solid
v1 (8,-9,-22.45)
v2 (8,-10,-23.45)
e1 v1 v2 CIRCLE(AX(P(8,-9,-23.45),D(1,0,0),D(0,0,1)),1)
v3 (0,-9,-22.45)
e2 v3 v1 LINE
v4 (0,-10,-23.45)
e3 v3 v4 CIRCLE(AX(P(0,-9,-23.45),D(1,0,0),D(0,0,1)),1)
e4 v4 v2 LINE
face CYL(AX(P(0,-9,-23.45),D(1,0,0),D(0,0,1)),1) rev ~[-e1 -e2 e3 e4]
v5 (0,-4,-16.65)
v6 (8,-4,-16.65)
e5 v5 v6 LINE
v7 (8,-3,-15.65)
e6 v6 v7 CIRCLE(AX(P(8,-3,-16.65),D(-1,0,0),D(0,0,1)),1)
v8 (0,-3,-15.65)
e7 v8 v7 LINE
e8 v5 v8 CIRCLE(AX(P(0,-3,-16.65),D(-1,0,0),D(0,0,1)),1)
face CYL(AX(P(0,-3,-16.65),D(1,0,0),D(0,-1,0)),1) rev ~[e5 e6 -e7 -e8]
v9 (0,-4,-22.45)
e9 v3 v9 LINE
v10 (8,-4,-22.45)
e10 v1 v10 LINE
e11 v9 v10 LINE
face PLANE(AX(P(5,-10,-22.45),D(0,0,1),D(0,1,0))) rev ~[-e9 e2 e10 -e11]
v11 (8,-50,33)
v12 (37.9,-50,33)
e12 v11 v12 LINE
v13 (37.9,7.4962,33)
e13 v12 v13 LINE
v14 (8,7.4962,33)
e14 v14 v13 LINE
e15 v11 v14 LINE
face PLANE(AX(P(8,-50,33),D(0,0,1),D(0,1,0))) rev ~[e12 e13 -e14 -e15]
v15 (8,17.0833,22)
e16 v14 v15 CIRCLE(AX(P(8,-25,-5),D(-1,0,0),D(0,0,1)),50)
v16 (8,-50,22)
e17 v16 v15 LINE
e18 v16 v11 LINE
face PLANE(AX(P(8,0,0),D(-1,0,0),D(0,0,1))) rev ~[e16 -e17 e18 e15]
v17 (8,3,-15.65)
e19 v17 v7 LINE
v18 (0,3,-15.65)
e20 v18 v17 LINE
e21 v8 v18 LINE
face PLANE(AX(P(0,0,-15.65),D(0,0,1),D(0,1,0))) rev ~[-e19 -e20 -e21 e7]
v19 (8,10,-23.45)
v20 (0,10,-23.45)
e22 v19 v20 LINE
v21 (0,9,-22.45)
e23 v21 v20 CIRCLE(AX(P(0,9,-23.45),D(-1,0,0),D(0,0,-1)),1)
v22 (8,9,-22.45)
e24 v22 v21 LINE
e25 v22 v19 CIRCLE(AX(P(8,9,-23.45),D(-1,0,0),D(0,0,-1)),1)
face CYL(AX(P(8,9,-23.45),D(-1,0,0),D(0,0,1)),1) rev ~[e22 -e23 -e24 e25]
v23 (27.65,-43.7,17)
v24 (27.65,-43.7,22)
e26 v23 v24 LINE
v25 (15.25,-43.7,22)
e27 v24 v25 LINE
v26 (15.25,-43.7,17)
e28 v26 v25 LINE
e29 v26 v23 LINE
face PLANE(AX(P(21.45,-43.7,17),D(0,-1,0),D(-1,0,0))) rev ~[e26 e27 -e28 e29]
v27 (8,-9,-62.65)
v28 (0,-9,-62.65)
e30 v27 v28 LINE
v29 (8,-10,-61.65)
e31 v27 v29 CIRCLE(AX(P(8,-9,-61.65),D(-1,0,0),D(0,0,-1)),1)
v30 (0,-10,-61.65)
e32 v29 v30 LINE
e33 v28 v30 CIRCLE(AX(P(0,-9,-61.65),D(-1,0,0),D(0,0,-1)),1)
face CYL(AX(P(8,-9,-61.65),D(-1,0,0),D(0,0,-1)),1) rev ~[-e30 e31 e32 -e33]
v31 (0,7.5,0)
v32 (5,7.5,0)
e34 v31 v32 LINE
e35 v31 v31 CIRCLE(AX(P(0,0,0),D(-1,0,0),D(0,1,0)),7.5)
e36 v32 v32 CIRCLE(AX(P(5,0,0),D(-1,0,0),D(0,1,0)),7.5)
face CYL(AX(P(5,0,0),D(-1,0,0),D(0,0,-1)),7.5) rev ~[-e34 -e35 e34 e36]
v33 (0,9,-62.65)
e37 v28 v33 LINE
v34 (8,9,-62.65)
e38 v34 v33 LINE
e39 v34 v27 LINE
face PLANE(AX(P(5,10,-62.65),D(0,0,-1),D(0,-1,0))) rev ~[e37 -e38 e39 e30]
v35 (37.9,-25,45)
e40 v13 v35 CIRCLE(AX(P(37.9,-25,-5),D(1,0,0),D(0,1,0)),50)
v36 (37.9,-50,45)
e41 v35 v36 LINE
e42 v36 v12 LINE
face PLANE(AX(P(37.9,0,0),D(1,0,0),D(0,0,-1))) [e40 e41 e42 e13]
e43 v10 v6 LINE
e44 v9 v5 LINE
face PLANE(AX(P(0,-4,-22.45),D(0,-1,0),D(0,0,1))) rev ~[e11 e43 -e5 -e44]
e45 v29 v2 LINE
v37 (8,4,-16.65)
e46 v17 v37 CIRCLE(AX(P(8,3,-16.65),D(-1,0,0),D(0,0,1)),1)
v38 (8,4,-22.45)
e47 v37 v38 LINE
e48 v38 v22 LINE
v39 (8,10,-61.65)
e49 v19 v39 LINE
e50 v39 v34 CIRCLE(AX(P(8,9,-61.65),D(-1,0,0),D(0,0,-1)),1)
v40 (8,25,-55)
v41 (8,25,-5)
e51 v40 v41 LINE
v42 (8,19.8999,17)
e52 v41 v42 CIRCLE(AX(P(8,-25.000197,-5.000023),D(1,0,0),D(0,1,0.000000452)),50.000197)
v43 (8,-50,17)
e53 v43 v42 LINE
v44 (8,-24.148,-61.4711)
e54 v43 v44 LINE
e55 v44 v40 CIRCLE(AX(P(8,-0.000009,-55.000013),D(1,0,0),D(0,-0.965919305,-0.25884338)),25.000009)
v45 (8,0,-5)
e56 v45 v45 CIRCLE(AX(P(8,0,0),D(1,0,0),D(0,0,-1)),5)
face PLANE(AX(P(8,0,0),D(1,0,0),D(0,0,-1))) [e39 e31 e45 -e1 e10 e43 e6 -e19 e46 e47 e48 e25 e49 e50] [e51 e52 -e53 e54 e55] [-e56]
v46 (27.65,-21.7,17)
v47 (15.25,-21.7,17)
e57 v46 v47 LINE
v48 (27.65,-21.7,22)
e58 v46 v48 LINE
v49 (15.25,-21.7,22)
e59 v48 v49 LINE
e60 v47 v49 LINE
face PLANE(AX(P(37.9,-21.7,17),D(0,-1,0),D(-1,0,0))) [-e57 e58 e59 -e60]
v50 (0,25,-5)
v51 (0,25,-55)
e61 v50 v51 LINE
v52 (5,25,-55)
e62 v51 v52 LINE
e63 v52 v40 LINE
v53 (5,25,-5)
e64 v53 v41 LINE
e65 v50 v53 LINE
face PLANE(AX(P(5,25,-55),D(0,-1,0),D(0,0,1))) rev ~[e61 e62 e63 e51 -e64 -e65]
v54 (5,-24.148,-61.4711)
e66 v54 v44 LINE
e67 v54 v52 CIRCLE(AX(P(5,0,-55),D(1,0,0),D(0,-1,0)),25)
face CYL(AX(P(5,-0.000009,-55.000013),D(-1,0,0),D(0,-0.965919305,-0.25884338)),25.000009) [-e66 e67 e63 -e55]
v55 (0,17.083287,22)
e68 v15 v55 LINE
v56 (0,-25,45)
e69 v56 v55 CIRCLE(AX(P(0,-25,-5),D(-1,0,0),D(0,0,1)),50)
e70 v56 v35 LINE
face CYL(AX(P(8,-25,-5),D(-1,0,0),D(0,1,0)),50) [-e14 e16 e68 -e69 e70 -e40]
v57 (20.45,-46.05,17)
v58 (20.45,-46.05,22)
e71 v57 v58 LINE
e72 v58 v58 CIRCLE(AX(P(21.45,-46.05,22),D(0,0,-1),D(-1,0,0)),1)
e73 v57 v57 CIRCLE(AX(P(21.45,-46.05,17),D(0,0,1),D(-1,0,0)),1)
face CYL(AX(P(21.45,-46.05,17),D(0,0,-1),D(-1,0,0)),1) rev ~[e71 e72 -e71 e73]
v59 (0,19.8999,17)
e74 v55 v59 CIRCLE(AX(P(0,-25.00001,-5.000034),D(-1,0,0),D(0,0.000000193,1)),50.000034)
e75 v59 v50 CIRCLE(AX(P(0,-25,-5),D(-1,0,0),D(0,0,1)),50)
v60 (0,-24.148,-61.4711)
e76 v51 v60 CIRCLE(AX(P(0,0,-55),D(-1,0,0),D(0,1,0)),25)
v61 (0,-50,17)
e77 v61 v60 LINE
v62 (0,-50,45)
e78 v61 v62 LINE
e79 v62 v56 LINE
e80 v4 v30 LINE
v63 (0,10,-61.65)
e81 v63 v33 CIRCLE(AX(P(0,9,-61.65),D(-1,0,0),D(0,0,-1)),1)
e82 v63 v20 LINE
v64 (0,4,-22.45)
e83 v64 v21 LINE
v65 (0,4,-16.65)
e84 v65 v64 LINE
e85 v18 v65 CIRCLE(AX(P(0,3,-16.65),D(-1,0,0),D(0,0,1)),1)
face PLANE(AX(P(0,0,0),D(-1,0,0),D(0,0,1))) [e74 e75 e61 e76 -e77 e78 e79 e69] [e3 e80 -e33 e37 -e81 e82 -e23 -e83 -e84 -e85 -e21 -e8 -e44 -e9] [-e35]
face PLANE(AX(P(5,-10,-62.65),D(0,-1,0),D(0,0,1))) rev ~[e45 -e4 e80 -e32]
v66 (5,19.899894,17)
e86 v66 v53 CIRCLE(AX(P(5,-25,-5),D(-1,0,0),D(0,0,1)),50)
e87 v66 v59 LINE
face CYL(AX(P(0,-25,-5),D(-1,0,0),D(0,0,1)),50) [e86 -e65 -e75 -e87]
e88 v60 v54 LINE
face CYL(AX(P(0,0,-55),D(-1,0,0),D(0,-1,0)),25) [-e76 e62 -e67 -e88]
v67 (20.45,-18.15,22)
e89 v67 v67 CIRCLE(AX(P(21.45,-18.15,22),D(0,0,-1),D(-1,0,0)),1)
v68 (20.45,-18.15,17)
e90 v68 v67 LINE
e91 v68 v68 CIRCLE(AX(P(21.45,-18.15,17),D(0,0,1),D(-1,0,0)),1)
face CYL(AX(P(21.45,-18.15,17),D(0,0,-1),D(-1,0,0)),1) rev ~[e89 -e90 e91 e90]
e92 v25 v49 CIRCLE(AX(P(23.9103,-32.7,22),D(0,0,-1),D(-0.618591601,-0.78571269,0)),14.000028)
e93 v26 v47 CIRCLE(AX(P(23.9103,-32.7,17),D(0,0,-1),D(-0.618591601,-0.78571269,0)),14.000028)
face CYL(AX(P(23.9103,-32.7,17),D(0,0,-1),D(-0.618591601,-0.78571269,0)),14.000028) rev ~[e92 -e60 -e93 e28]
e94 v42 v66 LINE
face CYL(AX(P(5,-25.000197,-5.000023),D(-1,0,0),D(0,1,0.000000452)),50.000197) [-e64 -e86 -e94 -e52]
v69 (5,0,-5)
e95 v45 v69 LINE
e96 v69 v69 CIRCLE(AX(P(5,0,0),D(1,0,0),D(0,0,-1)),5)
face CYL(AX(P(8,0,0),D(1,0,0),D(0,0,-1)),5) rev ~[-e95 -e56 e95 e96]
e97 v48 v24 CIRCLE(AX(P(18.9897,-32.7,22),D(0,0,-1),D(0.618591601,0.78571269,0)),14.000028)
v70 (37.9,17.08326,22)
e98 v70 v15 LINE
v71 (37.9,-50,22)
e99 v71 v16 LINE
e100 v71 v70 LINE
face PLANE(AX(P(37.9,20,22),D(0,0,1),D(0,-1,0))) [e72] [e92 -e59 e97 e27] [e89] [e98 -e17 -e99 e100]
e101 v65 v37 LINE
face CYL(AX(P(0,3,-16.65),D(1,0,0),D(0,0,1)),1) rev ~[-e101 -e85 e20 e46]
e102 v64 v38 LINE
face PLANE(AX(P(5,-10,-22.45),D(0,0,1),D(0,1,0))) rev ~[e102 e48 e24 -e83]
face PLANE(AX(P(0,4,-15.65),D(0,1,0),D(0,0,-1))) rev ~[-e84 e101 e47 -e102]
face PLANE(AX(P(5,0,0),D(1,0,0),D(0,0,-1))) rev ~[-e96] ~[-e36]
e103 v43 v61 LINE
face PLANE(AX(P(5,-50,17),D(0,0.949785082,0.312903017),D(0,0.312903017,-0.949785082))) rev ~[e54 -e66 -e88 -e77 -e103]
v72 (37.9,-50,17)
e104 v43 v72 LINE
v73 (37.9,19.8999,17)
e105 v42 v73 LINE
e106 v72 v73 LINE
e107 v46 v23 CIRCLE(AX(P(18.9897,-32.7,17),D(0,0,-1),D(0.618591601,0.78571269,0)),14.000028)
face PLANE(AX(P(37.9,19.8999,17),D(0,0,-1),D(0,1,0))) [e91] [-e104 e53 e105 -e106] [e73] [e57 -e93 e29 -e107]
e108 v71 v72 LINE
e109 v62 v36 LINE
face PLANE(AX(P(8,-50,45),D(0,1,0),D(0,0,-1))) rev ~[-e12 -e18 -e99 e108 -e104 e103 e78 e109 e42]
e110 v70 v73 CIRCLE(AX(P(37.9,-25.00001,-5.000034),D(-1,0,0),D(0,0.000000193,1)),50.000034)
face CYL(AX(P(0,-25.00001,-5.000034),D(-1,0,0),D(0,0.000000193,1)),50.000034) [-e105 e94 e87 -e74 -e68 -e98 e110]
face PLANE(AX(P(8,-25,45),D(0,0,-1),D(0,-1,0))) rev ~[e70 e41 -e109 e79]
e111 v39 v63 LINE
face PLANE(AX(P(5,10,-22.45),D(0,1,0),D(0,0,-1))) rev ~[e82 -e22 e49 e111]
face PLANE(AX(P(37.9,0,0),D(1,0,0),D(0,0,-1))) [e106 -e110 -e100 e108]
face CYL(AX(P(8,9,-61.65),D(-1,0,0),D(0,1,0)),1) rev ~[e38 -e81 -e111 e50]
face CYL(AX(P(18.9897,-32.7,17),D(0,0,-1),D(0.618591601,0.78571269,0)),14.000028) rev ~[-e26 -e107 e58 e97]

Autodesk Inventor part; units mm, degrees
ref_plane "YZ Plane" through (0, 0, 0) normal (1, 0, 0) x (0, 1, 0)
ref_plane "XZ Plane" through (0, 0, 0) normal (0, 1, 0) x (-1, 0, 0)
ref_plane "XY Plane" through (0, 0, 0) normal (0, 0, 1) x (1, 0, 0)
sketch "Sketch1" plane through (0, 0, 0) normal (1, 0, 0) x (0, 1, 0)
  circle A0 centre (0, 0) radius 16.575
  line L0 (0, 16.575) -> (0, -49.725)
  line L1 (0, -33.15) -> (0, -15.05)
  line L2 (0, -15.05) -> (0, -70.05)
  line L3 (10, -70.05) -> (-10, -70.05)
  line L4 (-10, -70.05) -> (-10, -15.05)
  line L5 (-10, -15.05) -> (10, -15.05)
  line L6 (10, -15.05) -> (10, -70.05)
  line L7 (10, -70.05) -> (-10, -15.05) construction
  line L8 (-10, -70.05) -> (10, -15.05) construction
  line L9 (10, -62.65) -> (-10, -62.65)
  line L10 (-10, -62.65) -> (-10, -22.45)
  line L11 (-10, -22.45) -> (10, -22.45)
  line L12 (10, -22.45) -> (10, -62.65)
  line L13 (10, -62.65) -> (-10, -22.45) construction
  line L14 (-10, -62.65) -> (10, -22.45) construction
  line L15 (-4.95, -27.2) -> (-4.95, -17.7)
  line L16 (-4.95, -17.7) -> (4.95, -17.7)
  line L17 (4.95, -27.2) -> (-4.95, -17.7) construction
  line L18 (-4.95, -27.2) -> (4.95, -17.7) construction
  line L19 (4.95, -67.4) -> (-4.95, -67.4)
  line L20 (-4.95, -67.4) -> (-4.95, -57.9)
  line L21 (-4.95, -57.9) -> (4.95, -57.9)
  line L22 (4.95, -67.4) -> (-4.95, -57.9) construction
  line L23 (-4.95, -67.4) -> (4.95, -57.9) construction
  circle A1 centre (4.95, -17.7) radius 1.5
  circle A2 centre (-4.95, -17.7) radius 1.5
  circle A3 centre (4.95, -67.4) radius 1.5
  circle A4 centre (-4.95, -67.4) radius 1.5
  circle A5 centre (0, -33.15) radius 6.8
  line L24 (0, -80) -> (0, -55)
  arc A6 (-25, -55) -> (25, -55) centre (0, -55) ccw
  line L25 (0, 0) -> (0, 45)
  line L26 (25, 45) -> (-25, 45)
  line L27 (25, 45) -> (25, -55)
  line L28 (-25, 45) -> (-25, -55)
  circle A7 centre (0, 0) radius 7.5
  point P0 (0, -42.55)
  point P1 (0, -42.55)
  point P2 (0, -22.45)
  point P3 (0, -62.65)
  dimension "d0" = 33.15
  dimension "d2" = 66.3
  dimension "d4" = 18.1
  dimension "d5" = 55
  dimension "d6" = 20
  dimension "d7" = 55
  dimension "d8" = 40.2
  dimension "d9" = 9.9
  dimension "d10" = 9.5
  dimension "d11" = 9.9
  dimension "d12" = 9.5
  dimension "d13" = 3
  dimension "d14" = 3
  dimension "d15" = 3
  dimension "d16" = 3
  dimension "d17" = 13.6
  dimension "d20" = 25
  dimension "d21" = 45
  dimension "d22" = 15
extrude "Extrusion1" add sketch "Sketch1" along normal blind 5 contours A0 L5 L0 A7 | A0 L25 L26 L27 A6 L24 L3 L6 L5 | L0 A7 L5 A0 | A0 L5 L4 L3 L24 A6 L28 L26 L25 | L5 L6 L11 L0 A0 | A0 L0 L5 | L5 L0 A0 | A0 L0 L16 A2 L15 L11 L4 L5 | L0 L11 L15 A2 L16 | L6 L9 L2 L0 A5 L11 | L11 L0 A5 L2 L21 L20 L9 L4 | L6 L3 L2 L9 | L9 L20 A4 L19 L2 L3 L4 | L9 L20 L21 L2 | L2 L19 A4 L20 L9
sketch "Sketch2" plane through (5, 0, 0) normal (1, 0, 0) x (0, 0, -1)
  line L0 (-45, -25) -> (55, -25) projected
  circle A0 centre (33.15, 0) radius 6.8 projected
  line L1 (33.15, 0) -> (15.05, 0)
  line L2 (15.05, 0) -> (70.05, 0)
  line L3 (62.65, 10) -> (22.45, 10)
  line L4 (22.45, 10) -> (22.45, -10)
  line L5 (22.45, -10) -> (62.65, -10)
  line L6 (62.65, -10) -> (62.65, 10)
  line L7 (62.65, 10) -> (22.45, -10) construction
  line L8 (22.45, 10) -> (62.65, -10) construction
  point P0 (42.55, 0)
  dimension "d25" = 18.1
  dimension "d26" = 55
  dimension "d27" = 40.2
  dimension "d28" = 20
extrude "Extrusion2" cut sketch "Sketch2" against normal blind 5 contours L2 L6 L5 L4 L1 A0 | A0 L1 L4 L3 L6 L2
sketch "Sketch3" plane through (5, 0, 0) normal (1, 0, 0) x (0, 0, -1)
  circle A0 centre (17.7, 4.95) radius 1.5 projected
  circle A1 centre (17.7, -4.95) radius 1.5 projected
  circle A2 centre (67.4, 4.95) radius 1.5 projected
  circle A3 centre (67.4, -4.95) radius 1.5 projected
extrude "Extrusion3" add sketch "Sketch3" against normal blind 5
sketch "Sketch4" plane through (5, 0, 0) normal (1, 0, 0) x (0, 0, -1)
  line L0 (55, 25) -> (-45, 25) projected
  line L1 (-45, 25) -> (-45, -25) projected
  line L2 (-45, -25) -> (55, -25) projected
  line L3 (-45, 25) -> (-35, 25)
  line L4 (-35, 25) -> (-35, -25)
  line L5 (-35, -25) -> (-45, -25)
  line L6 (-45, -25) -> (-45, 25)
  dimension "d33" = 10
extrude "Extrusion4" add sketch "Sketch4" along normal blind 32.9
sketch "Sketch5" plane through (0, -25, -55) normal (0, -1, 0) x (1, 0, 0)
  line L0 (5, 90) -> (37.9, 90)
  line L1 (37.9, 90) -> (37.9, 100)
  line L2 (37.9, 100) -> (5, 100)
  line L3 (5, 100) -> (5, 90)
  point P0 (0, 55)
extrude "Extrusion5" add sketch "Sketch5" along normal blind 25
sketch "Sketch6" plane through (0, 0, 0) normal (-1, 0, 0) x (0, 0, 1)
  arc A0 (-55, 25) -> (-55, -25) centre (-55, 0) ccw projected
  line L0 (45, -25) -> (-55, -25) projected
  line L1 (-55, 25) -> (45, 25) projected
  line L2 (45, -25) -> (45, -50)
  line L3 (45, -50) -> (35, -50)
  line L4 (35, -50) -> (-61.4711, -24.148)
  line L5 (-55, -25) -> (45, -25)
  arc A1 (-61.4711, -24.148) -> (-55, -25) centre (-55, 0) ccw
  dimension "d38" = 25
  dimension "d39" = 10
extrude "Extrusion6" add sketch "Sketch6" against normal blind 5
sketch "Sketch7" plane through (0, 25, 45) normal (0, 0, 1) x (1, 0, 0)
  line L0 (37.9, -75) -> (0, -75) projected
  line L1 (0, 0) -> (37.9, 0) projected
  line L2 (18.95, -75) -> (18.95, -62.5)
  circle A0 centre (18.95, -62.5) radius 7.5
  point P0 (0, -25)
  dimension "d42" = 12.5
  dimension "d43" = 15
extrude "Extrusion7" cut sketch "Sketch7" against normal blind 10
sketch "Sketch8" plane through (5, 0, 0) normal (1, 0, 0) x (0, 0, -1)
  line L0 (-35, 25) -> (-35, -50) projected
  line L1 (55, 25) -> (-35, 25) projected
  line L2 (-35, -50) -> (-35, 25)
  line L3 (-35, -50) -> (-17, -50)
  line L4 (-17, -50) -> (-17, 25)
  line L5 (-17, -50) -> (61.4711, -24.148)
  line L6 (-17, -50) -> (-22, -50)
  line L7 (-22, -50) -> (-22, 25)
  line L8 (-17, 25) -> (-22, 25)
  dimension "d46" = 18
  dimension "d47" = 5
extrude "Extrusion8" add sketch "Sketch8" along normal blind 32.9 contours L1 L4 L3 L7
sketch "Sketch9" plane through (0, 0, 0) normal (-1, 0, 0) x (0, 0, 1)
  line L0 (-61.4711, -24.148) -> (35, -50) projected
  arc A0 (-55, 25) -> (-61.4711, -24.148) centre (-55, 0) ccw projected
  line L1 (17, -50) -> (-61.4711, -24.148)
  line L2 (-61.4711, -24.148) -> (35, -50)
  line L3 (35, -50) -> (17, -50)
  line L4 (35, -50) -> (17, -50)
  line L5 (17, -50) -> (-61.4711, -24.148)
  line L6 (-61.4711, -24.148) -> (35, -50)
  point P0 (45, -50)
  dimension "d50" = 28
extrude "Extrusion9" add sketch "Sketch9" against normal blind 5
sketch "Sketch11" plane through (0, 25, 45) normal (0, 0, 1) x (1, 0, 0)
  circle A0 centre (18.95, -62.5) radius 7.5 projected
  point P0 (0, -25)
extrude "Extrusion10" add sketch "Sketch11" against normal blind 10
sketch "Sketch12" plane through (0, 25, 45) normal (0, 0, 1) x (1, 0, 0)
  line L0 (37.9, -75) -> (0, -75) projected
  line L1 (0, -75) -> (5, -75)
  line L2 (37.9, -75) -> (5, -75)
  line L3 (21.45, -75) -> (21.45, -62.5)
  circle A0 centre (21.45, -62.5) radius 6.8
  point P0 (0, -25)
  dimension "d55" = 5
  dimension "d56" = 12.5
  dimension "d57" = 13.6
extrude "Extrusion11" cut sketch "Sketch12" against normal blind 10
sketch "Sketch13" plane through (37.9, 25, 17) normal (0, 0, -1) x (-1, 0, 0)
  line L0 (32.9, -75) -> (0, -75) projected
  line L1 (16.45, -75) -> (16.45, -62.5)
  circle A0 centre (16.45, -62.5) radius 6.2
  line L2 (16.45, -62.5) -> (16.45, -50.3)
  circle A1 centre (16.45, -56.4) radius 3.1
  point P0 (37.9, -25)
  dimension "d60" = 12.5
  dimension "d61" = 12.4
  dimension "d62" = 12.2
  dimension "d63" = 6.2
extrude "Extrusion12" cut sketch "Sketch13" against normal blind 5
sketch "Sketch15" plane through (37.9, 25, 17) normal (0, 0, -1) x (-1, 0, 0)
  arc A0 (13.4271, -57.0869) -> (19.4729, -57.0869) centre (16.45, -62.5) ccw projected
  line L0 (32.9, -75) -> (0, -75) projected
  line L1 (16.45, -62.5) -> (16.45, -73.1)
  circle A1 centre (16.45, -73.1) radius 1
  line L2 (16.45, -62.5) -> (16.45, -41.1)
  circle A2 centre (16.45, -41.1) radius 1
  point P0 (37.9, -25)
  dimension "d66" = 10.6
  dimension "d67" = 2
  dimension "d68" = 21.4
  dimension "d69" = 2
extrude "Extrusion13" cut sketch "Sketch15" against normal blind 5
sketch "Sketch16" plane through (37.9, 25, 17) normal (0, 0, -1) x (-1, 0, 0)
  circle A0 centre (16.45, -73.1) radius 1 projected
  circle A1 centre (16.45, -41.1) radius 1 projected
  line L0 (32.9, -75) -> (0, -75) projected
  line L1 (16.45, -41.1) -> (16.45, -43.15)
  line L2 (16.45, -73.1) -> (16.45, -71.05)
  point P0 (37.9, -25)
  dimension "d72" = 2.05
  dimension "d73" = 2.05
extrude "Extrusion14" add sketch "Sketch16" against normal blind 5
sketch "Sketch17" plane through (37.9, 25, 17) normal (0, 0, -1) x (-1, 0, 0)
  arc A0 (13.4271, -57.0869) -> (19.4729, -57.0869) centre (16.45, -62.5) ccw projected
  line L0 (32.9, -75) -> (0, -75) projected
  line L1 (16.45, -62.5) -> (16.45, -41.1)
  line L2 (16.45, -41.1) -> (16.45, -43.15)
  circle A1 centre (16.45, -43.15) radius 1
  line L3 (16.45, -62.5) -> (16.45, -73.1)
  line L4 (16.45, -73.1) -> (16.45, -71.05)
  circle A2 centre (16.45, -71.05) radius 1
  point P0 (37.9, -25)
  dimension "d76" = 21.4
  dimension "d77" = 2.05
  dimension "d78" = 2
  dimension "d79" = 10.6
  dimension "d80" = 2.05
  dimension "d81" = 2
extrude "Extrusion15" cut sketch "Sketch17" against normal blind 5
sketch "Sketch18" plane through (0, 0, 0) normal (-1, 0, 0) x (0, 0, 1)
  line L0 (45, 25) -> (45, -50) projected
  line L1 (-55, 25) -> (45, 25) projected
  line L2 (45, 25) -> (45, -20)
  line L3 (45, 25) -> (0, 25)
  line L4 (0, 25) -> (-5, 25)
  line L5 (45, -20) -> (45, -25)
  arc A0 (45, -25) -> (-5, 25) centre (-5, -25) ccw
  dimension "d84" = 45
  dimension "d86" = 5
  dimension "d87" = 5
extrude "Extrusion16" cut sketch "Sketch18" against normal blind 39
sketch "Sketch19" plane through (37.9, -50, 17) normal (0, 0, -1) x (-1, 0, 0)
  line L0 (32.9, 0) -> (32.9, 69.8999) projected
  arc A0 (13.4271, 17.9131) -> (19.4729, 17.9131) centre (16.45, 12.5) ccw projected
  arc A1 (19.4729, 17.9131) -> (13.4271, 17.9131) centre (16.45, 18.6) ccw projected
  line L1 (0, 25) -> (0, 0) projected
  line L2 (0, 6.3) -> (32.9, 6.3)
  line L3 (0, 6.3) -> (0, 28.3)
  line L4 (0, 55) -> (0, 25) projected
  line L5 (0, 28.3) -> (32.9, 28.3)
  line L6 (32.9, 28.3) -> (32.9, 6.3)
  point P0 (37.9, 50)
  dimension "d90" = 22
extrude "Extrusion17" cut sketch "Sketch19" against normal blind 5
sketch "Sketch21" plane through (5, 0, 0) normal (1, 0, 0) x (0, 0, -1)
  line L0 (22.45, -10) -> (22.45, 10) projected
  line L1 (22.45, 10) -> (62.65, 10) projected
  line L2 (62.65, 10) -> (62.65, -10) projected
  line L3 (62.65, -10) -> (22.45, -10) projected
  circle A0 centre (0, 0) radius 7.5 projected
  arc A1 (-22, 17.0833) -> (-35, 5) centre (5, -25) ccw projected
  line L4 (-35, 5) -> (-35, -50) projected
  line L5 (-35, -50) -> (-22, -50) projected
  line L6 (-22, -43.7) -> (-22, -50) projected
  line L7 (-17, -43.7) -> (-22, -43.7) projected
  line L8 (-17, -50) -> (-17, -43.7) projected
  line L9 (-17, -50) -> (61.4711, -24.148) projected
  arc A2 (61.4711, -24.148) -> (55, 25) centre (55, 0) ccw projected
  line L10 (55, 25) -> (5, 25) projected
  arc A3 (5, 25) -> (-17, 19.8999) centre (5, -25) ccw projected
  line L11 (-17, -21.7) -> (-17, 19.8999) projected
  line L12 (-17, -21.7) -> (-22, -21.7) projected
  line L13 (-22, 17.0833) -> (-22, -21.7) projected
extrude "Extrusion18" add sketch "Sketch21" along normal blind 3
sketch "Sketch22" plane through (0, -50, 45) normal (0, 0, 1) x (1, 0, 0)
  circle A0 centre (21.45, 12.5) radius 6.8 projected
  circle A1 centre (21.45, 12.5) radius 5
  point P0 (0, 50)
  dimension "d95" = 10
extrude "Extrusion19" add sketch "Sketch22" against normal blind 2
sketch "Sketch23" plane through (37.9, -50, 35) normal (0, 0, -1) x (-1, 0, 0)
  circle A0 centre (16.45, 12.5) radius 6.8 projected
  line L0 (29.9, 0) -> (29.9, 55) projected
  line L1 (29.9, 55) -> (0, 55) projected
  line L2 (0, 55) -> (0, 0) projected
  line L3 (29.9, 0) -> (0, 0) projected
  point P0 (37.9, 50)
extrude "Extrusion20" add sketch "Sketch23" along normal blind 2
sketch "Sketch24" plane through (37.9, -21.7, 17) normal (0, -1, 0) x (1, 0, 0)
  line L0 (-29.9, 5) -> (0, 5) projected
  line L1 (0, 0) -> (-10.25, 0)
  line L2 (-10.25, 0) -> (-10.25, 5)
  line L3 (-10.25, 5) -> (0, 5)
  line L4 (0, 5) -> (0, 0)
  line L5 (-29.9, 0) -> (-22.65, 0)
  line L6 (-22.65, 0) -> (-22.65, 5)
  line L7 (-22.65, 5) -> (-29.9, 5)
  line L8 (-29.9, 5) -> (-29.9, 0)
  point P0 (-37.9, -17)
  dimension "d100" = 10.25
  dimension "d101" = 7.25
extrude "Extrusion21" add sketch "Sketch24" along normal blind 22
sketch "Sketch25" plane through (37.9, -50, 33) normal (0, 0, -1) x (-1, 0, 0)
  circle A0 centre (16.45, 12.5) radius 6.8 projected
  circle A1 centre (16.45, 12.5) radius 5
  point P0 (37.9, 50)
  dimension "d104" = 10
extrude "Extrusion22" add sketch "Sketch25" against normal blind 2
sketch "Sketch26" plane through (8, 0, 0) normal (1, 0, 0) x (0, 0, -1)
  circle A0 centre (0, 0) radius 7.5 projected
  circle A1 centre (0, 0) radius 5
  dimension "d107" = 10
extrude "Extrusion23" add sketch "Sketch26" against normal blind 3
sketch "Sketch28" plane through (37.9, -50, 17) normal (0, 0, -1) x (-1, 0, 0)
  line L0 (10.25, 28.3) -> (10.25, 6.3) projected
  line L1 (22.65, 28.3) -> (22.65, 6.3) projected
  arc A0 (22.65, 6.3) -> (22.65, 28.3) centre (13.9897, 17.3) ccw
  arc A1 (10.25, 28.3) -> (10.25, 6.3) centre (18.9103, 17.3) ccw
  point P0 (37.9, 50)
  dimension "d111" = 14
  dimension "d112" = 14
extrude "Extrusion24" cut sketch "Sketch28" against normal blind 5
sketch "Sketch29" plane through (37.9, 0, 0) normal (1, 0, 0) x (0, 0, -1)
  arc A0 (-35, 5) -> (-45, -25) centre (5, -25) ccw projected
  line L0 (-45, -25) -> (-45, -50) projected
  line L1 (-45, -50) -> (-33, -50) projected
  line L2 (-33, 5) -> (-33, -50) projected
  line L3 (-35, 5) -> (-33, 5) projected
  point P0 (0, 0)
extrude "Extrusion25" cut sketch "Sketch29" against normal blind 29.9
sketch "Sketch30" plane through (0, -50, -55) normal (0, -1, 0) x (1, 0, 0)
  line L0 (8, 100) -> (8, 77) projected
  line L1 (8, 100) -> (0, 100) projected
  line L2 (0, 72) -> (0, 100) projected
  line L3 (8, 77) -> (0, 77)
  point P0 (0, 55)
extrude "Extrusion26" cut sketch "Sketch30" against normal blind 70
sketch "Sketch31" plane through (37.9, 0, 0) normal (1, 0, 0) x (0, 0, -1)
  line L0 (-17, -50) -> (-17, 19.8999) projected
  arc A0 (-17, 19.8999) -> (-22, 17.0833) centre (5, -25) ccw projected
  line L1 (-17, -50) -> (-17, 18)
  line L2 (-17, 18) -> (-17, 20)
  line L3 (-17, 20) -> (-22, 20)
  line L4 (-22, 20) -> (-22, 17.0833)
  line L5 (-17, 19.8999) -> (-17, 20)
  point P0 (0, 0)
  dimension "d119" = 68
  dimension "d120" = 2
  dimension "d121" = 5
extrude "Extrusion27" add sketch "Sketch31" against normal blind 37.9
sketch "Sketch32" plane through (0, 0, 0) normal (-1, 0, 0) x (0, 0, 1)
  line L0 (22, 20) -> (17, 20) projected
  line L1 (17, 20) -> (17, 19.8999) projected
  line L2 (17, -50) -> (45, -50)
  line L3 (22, -50) -> (17, -50) projected
  line L4 (45, -50) -> (45, 20)
  line L5 (45, 20) -> (22, 20)
  line L6 (45, -50) -> (45, -25)
  arc A0 (45, -25) -> (17, 19.8999) centre (-5, -25) ccw
  dimension "d124" = 28
  dimension "d125" = 70
  dimension "d127" = 25
  dimension "d128" = 50
sketch "Sketch33" plane through (0, 0, 0) normal (-1, 0, 0) x (0, 0, 1)
  line L0 (22, -50) -> (22, 20) projected
  line L1 (17, -50) -> (22, -50) projected
  line L2 (45, -50) -> (45, -25)
  arc A0 (45, -25) -> (-5, 25) centre (-5, -25) ccw
  line L3 (22, -50) -> (45, -50)
  arc A1 (45, -25) -> (22, 17.0833) centre (-5, -25) ccw
  dimension "d126" = 25
extrude "Extrusion28" cut sketch "Sketch32" against normal blind 37.9
extrude "Extrusion29" add sketch "Sketch33" against normal blind 8
sketch "Sketch34" plane through (8, 0, 0) normal (1, 0, 0) x (0, 0, -1)
  line L0 (-45, -25) -> (-45, -50) projected
  line L1 (-45, -50) -> (-33, -50)
  line L2 (-17, -50) -> (-45, -50) projected
  line L3 (-33, -50) -> (-33, 7.4962)
  arc A0 (5, 25) -> (-45, -25) centre (5, -25) ccw projected
  point P0 (0, 0)
  dimension "d133" = 12
  dimension "d134" = 90
extrude "Extrusion30" add sketch "Sketch34" along normal blind 29.9
sketch "Sketch35" plane through (0, 0, 0) normal (-1, 0, 0) x (0, 0, 1)
  line L0 (-62.65, -10) -> (-62.65, 10) projected
  line L1 (-62.65, 10) -> (-22.45, 10) projected
  line L2 (-62.65, 0) -> (-15.65, 0)
  line L3 (-22.45, -10) -> (-22.45, 10) projected
  line L4 (-22.45, 0) -> (-15.65, 0)
  line L5 (-22.45, -4) -> (-15.65, -4)
  line L6 (-15.65, -4) -> (-15.65, 4)
  line L7 (-15.65, 4) -> (-22.45, 4)
  line L8 (-22.45, 4) -> (-22.45, -4)
  line L9 (-22.45, -4) -> (-15.65, 4) construction
  line L10 (-15.65, -4) -> (-22.45, 4) construction
  point P0 (-19.05, 0)
  dimension "d137" = 47
  dimension "d138" = 8
extrude "Extrusion31" cut sketch "Sketch35" against normal blind 8 contours L3 L7 L6 L2 | L2 L6 L5 L3
fillet "Fillet1" radius 1 6 edges at (4, -4, -15.65) (4, 4, -15.65) (4, 10, -22.45) (4, 10, -62.65) (4, -10, -62.65) (4, -10, -22.45)
properties part number "packa_strana(b)_backup"
